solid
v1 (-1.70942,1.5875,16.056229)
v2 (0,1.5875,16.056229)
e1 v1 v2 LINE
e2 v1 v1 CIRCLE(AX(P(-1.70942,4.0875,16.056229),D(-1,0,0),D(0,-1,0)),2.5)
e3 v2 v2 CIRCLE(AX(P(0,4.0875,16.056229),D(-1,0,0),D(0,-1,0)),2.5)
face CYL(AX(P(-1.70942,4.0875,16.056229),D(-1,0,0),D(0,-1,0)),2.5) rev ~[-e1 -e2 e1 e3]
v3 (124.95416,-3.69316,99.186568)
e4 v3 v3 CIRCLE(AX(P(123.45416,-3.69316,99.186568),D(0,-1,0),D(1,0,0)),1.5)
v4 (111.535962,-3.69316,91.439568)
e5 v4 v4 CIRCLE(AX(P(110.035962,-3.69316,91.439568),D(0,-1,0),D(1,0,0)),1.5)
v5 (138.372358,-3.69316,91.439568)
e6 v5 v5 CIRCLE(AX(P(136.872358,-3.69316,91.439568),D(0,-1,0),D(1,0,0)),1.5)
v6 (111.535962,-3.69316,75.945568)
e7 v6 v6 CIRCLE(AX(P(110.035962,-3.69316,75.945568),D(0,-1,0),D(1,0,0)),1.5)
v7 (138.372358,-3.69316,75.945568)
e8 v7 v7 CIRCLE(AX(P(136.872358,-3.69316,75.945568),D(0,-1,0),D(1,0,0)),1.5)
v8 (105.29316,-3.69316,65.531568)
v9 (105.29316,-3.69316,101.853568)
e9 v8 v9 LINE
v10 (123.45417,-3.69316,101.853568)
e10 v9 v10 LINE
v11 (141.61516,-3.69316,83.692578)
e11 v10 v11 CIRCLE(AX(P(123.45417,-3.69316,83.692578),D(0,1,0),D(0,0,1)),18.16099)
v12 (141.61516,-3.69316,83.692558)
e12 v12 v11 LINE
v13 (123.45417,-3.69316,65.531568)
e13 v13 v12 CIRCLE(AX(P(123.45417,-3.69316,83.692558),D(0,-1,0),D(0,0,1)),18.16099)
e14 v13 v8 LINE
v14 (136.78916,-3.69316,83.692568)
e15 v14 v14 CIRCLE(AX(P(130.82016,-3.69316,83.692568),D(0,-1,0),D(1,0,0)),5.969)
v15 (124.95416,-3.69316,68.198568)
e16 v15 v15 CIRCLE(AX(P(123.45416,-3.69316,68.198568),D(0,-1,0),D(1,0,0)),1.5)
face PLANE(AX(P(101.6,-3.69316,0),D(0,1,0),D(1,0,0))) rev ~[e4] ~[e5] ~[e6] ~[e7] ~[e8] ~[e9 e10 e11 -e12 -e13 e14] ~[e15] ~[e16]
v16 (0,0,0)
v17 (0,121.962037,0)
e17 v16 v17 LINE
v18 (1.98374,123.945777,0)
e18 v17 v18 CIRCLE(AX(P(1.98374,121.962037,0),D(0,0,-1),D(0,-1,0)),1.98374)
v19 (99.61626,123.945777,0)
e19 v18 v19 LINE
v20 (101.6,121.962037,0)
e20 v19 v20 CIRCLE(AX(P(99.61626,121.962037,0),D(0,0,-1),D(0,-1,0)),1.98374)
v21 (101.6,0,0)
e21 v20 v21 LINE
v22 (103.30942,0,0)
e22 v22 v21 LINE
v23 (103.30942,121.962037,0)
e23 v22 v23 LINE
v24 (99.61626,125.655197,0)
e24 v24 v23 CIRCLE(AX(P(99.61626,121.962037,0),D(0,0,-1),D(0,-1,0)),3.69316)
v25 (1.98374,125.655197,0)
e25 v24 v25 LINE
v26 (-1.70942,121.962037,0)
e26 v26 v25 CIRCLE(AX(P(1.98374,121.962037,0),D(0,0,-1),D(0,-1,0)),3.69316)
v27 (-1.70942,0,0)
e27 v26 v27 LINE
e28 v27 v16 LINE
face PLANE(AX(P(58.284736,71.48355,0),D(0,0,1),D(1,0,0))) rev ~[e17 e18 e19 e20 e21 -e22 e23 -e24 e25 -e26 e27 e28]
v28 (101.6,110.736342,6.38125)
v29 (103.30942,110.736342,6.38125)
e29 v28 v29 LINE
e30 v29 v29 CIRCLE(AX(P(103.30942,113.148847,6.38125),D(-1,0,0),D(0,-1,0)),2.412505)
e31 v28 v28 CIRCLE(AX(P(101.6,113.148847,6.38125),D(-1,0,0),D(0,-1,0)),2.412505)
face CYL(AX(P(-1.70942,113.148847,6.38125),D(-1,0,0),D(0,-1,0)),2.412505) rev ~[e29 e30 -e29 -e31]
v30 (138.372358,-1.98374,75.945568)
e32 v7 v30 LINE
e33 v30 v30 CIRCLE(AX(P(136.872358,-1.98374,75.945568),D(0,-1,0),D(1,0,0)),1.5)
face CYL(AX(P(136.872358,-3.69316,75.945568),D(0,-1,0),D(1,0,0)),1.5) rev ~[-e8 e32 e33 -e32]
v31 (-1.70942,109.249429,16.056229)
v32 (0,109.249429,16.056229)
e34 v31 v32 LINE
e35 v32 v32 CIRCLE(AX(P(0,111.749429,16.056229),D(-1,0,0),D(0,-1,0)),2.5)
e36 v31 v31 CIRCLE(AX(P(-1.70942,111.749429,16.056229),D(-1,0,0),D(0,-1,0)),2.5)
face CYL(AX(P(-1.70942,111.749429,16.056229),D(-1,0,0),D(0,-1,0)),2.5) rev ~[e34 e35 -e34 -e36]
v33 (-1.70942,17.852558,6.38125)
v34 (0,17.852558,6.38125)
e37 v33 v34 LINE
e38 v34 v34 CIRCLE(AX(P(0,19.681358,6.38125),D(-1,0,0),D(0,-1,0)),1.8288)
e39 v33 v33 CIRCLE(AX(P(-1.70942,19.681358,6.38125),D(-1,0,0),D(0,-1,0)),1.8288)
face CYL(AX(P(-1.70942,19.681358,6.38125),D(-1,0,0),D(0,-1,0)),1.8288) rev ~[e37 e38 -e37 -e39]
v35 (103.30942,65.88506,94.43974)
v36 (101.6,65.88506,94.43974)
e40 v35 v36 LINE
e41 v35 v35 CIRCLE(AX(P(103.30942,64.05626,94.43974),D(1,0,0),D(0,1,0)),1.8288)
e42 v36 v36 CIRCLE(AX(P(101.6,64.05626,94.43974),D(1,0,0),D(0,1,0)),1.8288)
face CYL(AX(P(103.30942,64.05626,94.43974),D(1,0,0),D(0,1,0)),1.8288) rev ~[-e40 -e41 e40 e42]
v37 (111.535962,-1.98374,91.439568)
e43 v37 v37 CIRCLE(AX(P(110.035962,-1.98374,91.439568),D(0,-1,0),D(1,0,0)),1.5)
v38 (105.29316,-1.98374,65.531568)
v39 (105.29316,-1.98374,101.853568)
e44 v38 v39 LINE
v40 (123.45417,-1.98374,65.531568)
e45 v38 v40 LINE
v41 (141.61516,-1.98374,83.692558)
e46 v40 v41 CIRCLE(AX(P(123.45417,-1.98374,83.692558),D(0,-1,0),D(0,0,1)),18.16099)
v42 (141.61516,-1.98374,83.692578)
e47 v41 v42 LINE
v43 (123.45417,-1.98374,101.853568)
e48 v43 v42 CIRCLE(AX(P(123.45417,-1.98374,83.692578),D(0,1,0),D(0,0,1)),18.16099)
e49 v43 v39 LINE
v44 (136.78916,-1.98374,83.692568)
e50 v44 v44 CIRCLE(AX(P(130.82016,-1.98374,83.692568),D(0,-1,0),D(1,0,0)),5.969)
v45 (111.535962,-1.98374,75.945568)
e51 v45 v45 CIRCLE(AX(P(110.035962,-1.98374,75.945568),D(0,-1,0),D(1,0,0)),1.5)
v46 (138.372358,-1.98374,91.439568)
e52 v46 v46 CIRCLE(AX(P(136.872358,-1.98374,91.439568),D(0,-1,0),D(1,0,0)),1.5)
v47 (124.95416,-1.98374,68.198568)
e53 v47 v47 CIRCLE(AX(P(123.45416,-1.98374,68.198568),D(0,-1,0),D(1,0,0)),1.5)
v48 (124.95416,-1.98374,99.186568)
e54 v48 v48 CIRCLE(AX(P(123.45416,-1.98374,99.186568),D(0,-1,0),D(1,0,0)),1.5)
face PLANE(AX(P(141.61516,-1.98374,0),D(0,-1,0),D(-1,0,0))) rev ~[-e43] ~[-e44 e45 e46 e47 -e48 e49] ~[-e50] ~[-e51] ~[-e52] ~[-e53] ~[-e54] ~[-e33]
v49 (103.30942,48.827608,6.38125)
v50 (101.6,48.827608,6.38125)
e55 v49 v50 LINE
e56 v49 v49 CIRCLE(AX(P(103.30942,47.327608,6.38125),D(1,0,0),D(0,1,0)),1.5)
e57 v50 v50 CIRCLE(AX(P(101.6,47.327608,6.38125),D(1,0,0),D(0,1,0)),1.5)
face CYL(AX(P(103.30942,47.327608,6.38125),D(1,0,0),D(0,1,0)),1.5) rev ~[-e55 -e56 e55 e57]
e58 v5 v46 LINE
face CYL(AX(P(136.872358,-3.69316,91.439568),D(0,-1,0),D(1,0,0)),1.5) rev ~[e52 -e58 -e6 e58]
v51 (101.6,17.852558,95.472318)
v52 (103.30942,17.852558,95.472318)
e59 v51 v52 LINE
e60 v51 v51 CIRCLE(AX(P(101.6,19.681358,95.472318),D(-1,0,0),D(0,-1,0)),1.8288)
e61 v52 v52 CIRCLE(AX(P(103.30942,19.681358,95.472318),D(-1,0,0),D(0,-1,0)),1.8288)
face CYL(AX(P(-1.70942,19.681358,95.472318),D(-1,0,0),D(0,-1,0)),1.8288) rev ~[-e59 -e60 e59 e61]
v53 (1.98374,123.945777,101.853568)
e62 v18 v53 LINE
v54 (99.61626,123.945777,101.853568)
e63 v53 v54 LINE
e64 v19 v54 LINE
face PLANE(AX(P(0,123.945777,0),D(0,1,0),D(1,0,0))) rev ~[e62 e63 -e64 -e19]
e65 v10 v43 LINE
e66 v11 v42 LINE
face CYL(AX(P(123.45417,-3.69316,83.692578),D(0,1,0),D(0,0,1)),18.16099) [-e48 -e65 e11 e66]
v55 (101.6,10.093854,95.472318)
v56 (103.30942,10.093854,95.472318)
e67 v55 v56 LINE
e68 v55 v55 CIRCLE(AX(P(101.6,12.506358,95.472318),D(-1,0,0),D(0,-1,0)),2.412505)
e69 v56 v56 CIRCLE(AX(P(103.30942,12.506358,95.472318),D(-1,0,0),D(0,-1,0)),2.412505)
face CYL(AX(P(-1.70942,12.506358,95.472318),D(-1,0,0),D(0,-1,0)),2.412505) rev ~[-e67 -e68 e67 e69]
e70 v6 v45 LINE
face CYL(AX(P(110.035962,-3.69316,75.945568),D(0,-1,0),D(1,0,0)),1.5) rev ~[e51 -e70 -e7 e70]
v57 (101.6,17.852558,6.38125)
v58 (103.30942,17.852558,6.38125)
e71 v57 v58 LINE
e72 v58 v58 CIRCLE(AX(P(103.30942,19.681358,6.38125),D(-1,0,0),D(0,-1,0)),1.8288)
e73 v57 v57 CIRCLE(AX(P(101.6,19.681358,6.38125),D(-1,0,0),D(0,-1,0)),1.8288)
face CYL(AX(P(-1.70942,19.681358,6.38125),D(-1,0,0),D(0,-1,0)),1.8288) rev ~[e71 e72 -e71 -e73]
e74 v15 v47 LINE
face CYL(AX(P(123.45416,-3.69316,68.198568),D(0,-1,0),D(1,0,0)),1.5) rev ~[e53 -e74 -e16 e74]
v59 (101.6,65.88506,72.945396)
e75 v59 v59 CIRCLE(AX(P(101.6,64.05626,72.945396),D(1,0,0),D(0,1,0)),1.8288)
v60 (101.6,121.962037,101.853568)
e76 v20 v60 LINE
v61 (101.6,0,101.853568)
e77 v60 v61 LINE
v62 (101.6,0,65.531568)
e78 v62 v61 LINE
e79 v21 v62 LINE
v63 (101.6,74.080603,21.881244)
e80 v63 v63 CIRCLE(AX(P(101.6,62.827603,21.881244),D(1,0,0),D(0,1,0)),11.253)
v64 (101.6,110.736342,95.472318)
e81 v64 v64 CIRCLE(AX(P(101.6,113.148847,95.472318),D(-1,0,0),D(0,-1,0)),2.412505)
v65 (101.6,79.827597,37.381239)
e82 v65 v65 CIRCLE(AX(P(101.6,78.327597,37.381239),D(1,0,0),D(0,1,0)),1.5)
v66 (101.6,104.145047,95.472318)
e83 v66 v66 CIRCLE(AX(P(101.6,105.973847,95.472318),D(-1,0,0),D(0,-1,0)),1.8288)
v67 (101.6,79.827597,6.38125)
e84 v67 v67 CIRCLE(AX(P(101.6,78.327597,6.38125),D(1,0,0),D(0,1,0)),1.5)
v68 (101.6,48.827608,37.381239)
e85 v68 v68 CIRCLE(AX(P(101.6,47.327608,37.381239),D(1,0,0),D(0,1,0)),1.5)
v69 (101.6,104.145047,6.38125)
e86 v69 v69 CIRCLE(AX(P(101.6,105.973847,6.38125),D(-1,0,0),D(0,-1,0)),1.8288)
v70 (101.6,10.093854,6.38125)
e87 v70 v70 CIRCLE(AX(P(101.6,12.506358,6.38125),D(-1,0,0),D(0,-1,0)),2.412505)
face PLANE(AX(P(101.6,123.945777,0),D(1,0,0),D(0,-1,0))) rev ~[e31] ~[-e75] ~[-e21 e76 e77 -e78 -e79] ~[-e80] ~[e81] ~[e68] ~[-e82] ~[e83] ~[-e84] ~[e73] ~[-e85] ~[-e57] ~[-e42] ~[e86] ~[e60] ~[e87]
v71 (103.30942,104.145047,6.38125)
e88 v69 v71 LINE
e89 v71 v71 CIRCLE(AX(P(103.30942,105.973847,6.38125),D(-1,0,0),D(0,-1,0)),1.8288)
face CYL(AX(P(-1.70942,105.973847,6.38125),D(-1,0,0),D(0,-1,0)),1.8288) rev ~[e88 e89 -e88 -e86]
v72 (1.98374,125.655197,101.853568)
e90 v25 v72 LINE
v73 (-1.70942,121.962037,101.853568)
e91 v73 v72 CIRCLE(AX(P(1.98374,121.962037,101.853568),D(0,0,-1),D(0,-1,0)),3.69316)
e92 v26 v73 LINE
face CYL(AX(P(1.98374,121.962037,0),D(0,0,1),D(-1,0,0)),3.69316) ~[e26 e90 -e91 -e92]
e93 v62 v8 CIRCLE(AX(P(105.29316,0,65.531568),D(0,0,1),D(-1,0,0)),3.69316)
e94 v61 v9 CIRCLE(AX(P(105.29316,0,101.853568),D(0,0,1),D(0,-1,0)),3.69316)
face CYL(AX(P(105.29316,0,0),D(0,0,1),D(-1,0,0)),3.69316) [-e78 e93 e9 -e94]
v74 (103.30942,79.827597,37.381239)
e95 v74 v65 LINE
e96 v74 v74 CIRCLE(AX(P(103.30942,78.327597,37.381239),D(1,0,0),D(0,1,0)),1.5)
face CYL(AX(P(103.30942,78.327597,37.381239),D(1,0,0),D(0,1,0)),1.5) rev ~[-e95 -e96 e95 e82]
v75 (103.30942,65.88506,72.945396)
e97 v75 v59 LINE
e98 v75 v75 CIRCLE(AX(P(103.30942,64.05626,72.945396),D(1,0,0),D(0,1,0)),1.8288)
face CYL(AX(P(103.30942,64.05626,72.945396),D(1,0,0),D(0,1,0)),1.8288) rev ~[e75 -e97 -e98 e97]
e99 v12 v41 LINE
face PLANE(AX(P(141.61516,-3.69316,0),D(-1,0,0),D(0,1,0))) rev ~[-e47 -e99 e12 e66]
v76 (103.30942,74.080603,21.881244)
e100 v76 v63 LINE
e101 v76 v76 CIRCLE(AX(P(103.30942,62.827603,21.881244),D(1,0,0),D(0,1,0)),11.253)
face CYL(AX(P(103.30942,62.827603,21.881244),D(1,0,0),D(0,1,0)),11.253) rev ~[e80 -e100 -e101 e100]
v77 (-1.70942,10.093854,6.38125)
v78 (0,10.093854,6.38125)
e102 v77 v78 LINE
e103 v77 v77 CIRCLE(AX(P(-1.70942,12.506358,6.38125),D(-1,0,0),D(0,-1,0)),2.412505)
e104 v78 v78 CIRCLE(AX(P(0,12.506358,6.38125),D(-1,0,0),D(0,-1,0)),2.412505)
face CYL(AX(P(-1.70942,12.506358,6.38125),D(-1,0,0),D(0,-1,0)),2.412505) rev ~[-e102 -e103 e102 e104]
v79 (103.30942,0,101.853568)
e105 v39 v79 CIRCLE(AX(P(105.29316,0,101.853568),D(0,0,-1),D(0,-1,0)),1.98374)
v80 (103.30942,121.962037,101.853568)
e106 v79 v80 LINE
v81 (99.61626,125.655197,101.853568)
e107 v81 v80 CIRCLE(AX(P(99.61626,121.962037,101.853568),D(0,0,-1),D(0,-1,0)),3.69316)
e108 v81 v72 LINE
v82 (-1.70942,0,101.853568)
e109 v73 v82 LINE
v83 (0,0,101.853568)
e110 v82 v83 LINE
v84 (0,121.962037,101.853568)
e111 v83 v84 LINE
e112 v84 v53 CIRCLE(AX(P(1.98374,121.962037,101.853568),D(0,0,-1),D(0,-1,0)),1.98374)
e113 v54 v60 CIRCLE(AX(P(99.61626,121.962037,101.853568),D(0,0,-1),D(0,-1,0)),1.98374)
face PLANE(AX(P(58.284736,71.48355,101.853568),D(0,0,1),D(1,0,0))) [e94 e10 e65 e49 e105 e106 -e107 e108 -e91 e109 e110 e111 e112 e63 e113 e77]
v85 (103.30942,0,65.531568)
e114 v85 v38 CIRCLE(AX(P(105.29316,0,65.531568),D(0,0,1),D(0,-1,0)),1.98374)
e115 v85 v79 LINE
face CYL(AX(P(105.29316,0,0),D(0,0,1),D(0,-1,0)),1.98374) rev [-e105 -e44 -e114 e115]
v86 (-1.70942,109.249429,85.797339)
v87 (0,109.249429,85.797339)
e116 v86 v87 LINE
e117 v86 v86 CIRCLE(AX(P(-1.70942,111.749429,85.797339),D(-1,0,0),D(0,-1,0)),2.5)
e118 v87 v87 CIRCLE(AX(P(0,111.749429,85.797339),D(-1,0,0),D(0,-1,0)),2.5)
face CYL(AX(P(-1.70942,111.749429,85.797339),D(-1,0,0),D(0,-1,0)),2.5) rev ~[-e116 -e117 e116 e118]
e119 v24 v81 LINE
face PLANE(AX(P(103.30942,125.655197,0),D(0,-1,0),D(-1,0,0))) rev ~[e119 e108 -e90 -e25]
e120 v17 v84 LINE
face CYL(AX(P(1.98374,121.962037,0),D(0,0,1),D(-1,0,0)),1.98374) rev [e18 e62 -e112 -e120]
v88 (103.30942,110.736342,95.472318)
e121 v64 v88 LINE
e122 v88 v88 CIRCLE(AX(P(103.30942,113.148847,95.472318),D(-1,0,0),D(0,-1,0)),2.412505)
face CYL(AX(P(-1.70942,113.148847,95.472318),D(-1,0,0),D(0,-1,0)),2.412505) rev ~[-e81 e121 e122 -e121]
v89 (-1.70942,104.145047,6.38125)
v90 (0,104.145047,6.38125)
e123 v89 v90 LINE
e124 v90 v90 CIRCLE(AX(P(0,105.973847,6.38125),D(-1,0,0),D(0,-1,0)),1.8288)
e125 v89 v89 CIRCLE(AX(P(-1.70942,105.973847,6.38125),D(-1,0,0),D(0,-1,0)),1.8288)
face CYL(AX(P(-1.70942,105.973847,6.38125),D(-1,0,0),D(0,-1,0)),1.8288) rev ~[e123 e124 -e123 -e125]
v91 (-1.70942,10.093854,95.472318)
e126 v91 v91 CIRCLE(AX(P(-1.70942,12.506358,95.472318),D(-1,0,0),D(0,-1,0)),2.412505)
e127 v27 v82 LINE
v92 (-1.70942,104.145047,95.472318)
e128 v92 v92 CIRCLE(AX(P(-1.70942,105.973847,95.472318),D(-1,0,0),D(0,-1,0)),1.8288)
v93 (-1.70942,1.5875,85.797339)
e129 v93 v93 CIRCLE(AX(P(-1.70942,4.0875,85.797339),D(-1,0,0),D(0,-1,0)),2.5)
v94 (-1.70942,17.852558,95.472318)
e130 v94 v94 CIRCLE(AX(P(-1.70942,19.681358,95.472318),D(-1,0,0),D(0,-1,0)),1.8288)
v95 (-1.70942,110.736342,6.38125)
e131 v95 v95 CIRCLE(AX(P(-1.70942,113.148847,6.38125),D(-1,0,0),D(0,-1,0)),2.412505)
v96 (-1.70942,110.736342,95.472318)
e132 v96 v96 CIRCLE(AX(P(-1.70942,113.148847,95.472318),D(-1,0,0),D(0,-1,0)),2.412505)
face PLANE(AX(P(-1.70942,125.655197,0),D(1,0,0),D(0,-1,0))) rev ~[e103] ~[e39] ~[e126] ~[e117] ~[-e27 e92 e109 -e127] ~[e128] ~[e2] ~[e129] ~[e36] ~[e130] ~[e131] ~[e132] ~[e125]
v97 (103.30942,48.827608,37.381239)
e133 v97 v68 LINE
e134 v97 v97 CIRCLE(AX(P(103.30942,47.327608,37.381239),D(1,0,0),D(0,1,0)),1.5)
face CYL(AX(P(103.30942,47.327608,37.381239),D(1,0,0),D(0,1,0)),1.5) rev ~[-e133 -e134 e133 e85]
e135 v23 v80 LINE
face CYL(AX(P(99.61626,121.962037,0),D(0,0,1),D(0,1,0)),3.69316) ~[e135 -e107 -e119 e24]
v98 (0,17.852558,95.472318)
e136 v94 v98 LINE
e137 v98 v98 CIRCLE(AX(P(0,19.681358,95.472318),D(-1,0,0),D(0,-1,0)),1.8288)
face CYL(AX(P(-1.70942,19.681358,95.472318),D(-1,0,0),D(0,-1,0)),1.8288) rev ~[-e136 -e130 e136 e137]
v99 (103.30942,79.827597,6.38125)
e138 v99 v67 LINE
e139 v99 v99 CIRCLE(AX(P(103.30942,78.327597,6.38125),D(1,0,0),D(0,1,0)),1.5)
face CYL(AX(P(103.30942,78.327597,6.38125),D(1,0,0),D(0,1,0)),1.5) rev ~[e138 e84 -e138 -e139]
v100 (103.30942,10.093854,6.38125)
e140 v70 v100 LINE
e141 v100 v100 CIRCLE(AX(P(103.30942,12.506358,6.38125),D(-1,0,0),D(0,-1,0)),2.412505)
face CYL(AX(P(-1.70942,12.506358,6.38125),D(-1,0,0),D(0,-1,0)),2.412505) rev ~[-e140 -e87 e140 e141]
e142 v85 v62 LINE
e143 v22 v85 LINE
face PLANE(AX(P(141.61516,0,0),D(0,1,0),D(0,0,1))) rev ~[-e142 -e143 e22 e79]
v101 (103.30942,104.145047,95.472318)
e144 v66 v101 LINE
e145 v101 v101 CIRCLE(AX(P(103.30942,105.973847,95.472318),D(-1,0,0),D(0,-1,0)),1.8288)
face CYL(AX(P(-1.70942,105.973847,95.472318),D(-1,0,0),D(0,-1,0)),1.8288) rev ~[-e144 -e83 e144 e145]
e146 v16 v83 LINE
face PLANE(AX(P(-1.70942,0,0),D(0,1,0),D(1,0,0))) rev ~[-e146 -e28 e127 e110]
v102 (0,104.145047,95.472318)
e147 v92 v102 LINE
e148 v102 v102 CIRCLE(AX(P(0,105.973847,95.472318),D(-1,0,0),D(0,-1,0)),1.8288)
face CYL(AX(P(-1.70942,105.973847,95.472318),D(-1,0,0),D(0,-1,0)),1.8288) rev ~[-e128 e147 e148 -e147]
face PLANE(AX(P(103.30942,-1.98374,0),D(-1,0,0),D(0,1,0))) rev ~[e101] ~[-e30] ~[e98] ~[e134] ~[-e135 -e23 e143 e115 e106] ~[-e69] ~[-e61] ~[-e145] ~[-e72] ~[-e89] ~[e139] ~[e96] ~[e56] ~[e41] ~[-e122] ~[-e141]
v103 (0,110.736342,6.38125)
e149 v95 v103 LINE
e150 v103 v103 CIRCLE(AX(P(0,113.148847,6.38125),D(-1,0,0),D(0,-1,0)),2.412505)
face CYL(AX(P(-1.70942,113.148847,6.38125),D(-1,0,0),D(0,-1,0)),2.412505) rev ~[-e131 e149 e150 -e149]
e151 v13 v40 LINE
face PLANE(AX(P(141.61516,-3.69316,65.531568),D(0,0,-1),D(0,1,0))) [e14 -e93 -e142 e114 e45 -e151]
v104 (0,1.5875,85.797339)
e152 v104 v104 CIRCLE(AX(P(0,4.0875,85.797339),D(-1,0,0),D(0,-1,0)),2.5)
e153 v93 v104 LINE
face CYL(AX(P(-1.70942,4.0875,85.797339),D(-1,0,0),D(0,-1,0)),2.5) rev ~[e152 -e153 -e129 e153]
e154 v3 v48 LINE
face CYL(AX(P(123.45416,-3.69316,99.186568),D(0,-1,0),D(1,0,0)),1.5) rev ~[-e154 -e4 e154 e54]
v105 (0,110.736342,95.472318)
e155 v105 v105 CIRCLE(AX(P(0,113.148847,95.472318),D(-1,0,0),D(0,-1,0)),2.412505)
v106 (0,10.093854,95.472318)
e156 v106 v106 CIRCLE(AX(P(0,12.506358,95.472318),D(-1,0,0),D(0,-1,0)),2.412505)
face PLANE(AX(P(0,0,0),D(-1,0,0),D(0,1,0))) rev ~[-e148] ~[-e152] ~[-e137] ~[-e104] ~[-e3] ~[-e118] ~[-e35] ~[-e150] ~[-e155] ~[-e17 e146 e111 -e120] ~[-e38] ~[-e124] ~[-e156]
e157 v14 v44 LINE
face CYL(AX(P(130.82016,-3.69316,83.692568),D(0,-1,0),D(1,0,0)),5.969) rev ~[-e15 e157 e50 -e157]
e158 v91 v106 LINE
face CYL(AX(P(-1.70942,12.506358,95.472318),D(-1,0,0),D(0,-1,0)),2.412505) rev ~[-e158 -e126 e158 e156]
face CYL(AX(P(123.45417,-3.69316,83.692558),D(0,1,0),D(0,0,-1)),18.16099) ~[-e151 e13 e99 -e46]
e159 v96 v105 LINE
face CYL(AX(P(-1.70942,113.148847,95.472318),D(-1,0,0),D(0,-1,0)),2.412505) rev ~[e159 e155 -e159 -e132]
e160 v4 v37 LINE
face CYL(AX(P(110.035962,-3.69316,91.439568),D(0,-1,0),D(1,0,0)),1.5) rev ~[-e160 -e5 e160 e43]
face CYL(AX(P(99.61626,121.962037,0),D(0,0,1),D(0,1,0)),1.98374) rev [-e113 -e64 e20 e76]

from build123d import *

# Parameters (mm, degrees)
F1_DEPTH  = 101.8535682
F2_R      = 1.5
F2_R_2    = 5.969
F3_DEPTH  = 1.70942
F4_R      = 1.98374
F5_R      = 3.69316
F6_R      = 2.4125047
F6_R_2    = 1.8288
F7_DEPTH  = 105.01884
F8_R      = 11.2530001
F8_R_2    = 1.5
F8_R_3    = 1.8288
F9_DEPTH  = 103.30942
F10_W     = 3.69316
F10_H     = 65.5315682
F11_DEPTH = 40.01516
F12_R     = 18.16099
F13_R     = 2.5
F14_DEPTH = 1.70942


# Not quite as in the source:
# - a fillet or chamfer is up to 0.001 mm smaller than in the source, because OpenCascade refuses the exact size
# - a feature names something its author has since deleted; it is built from what else it names


with BuildPart() as f1:
    # F0 (on Top) → F1 (new body)
    with BuildSketch(Plane.XY):
        Polygon((-1.70942, 0), (0, 0), (0, 123.945777), (101.6, 123.945777), (101.6, -3.69316), (141.61516, -3.69316), (141.61516, -1.98374), (103.30942, -1.98374), (103.30942, 125.655197), (-1.70942, 125.655197), align=None)
    extrude(amount=F1_DEPTH)

    # F2 (on face) → F3 (cut, through all)
    with BuildSketch(Plane.XZ.offset(3.69316)):
        with Locations((136.8723576062, 91.4395682)):
            Circle(F2_R)
        with Locations((130.82016, 83.6925682)):
            Circle(F2_R_2)
        with Locations((136.8723576062, 75.9455682)):
            Circle(F2_R)
        with Locations((123.45416, 99.1865682)):
            Circle(F2_R)
        with Locations((110.0359623938, 91.4395682)):
            Circle(F2_R)
        with Locations((110.0359623938, 75.9455682)):
            Circle(F2_R)
        with Locations((123.45416, 68.1985682)):
            Circle(F2_R)
    extrude(amount=-F3_DEPTH, mode=Mode.SUBTRACT)

    # F4
    f4_edges = [f1.edges().sort_by_distance(p)[0] for p in [
        (0, 123.945777, 50.926784),
        (101.6, 123.945777, 50.926784),
        (103.30942, -1.98374, 50.926784),
    ]]
    fillet(f4_edges, radius=F4_R)

    # F5
    f5_edges = [f1.edges().sort_by_distance(p)[0] for p in [
        (-1.70942, 125.655197, 50.926784),
        (103.30942, 125.655197, 50.926784),
        (101.6, -3.69316, 50.926784),
    ]]
    fillet(f5_edges, radius=F5_R)

    # F6 (on face) → F7 (cut, through all)
    with BuildSketch(Plane(origin=(-1.70942, 0, 0), x_dir=(0, -1, 0), z_dir=(-1, 0, 0))):
        with Locations((-12.5063584, 95.4723182)):
            Circle(F6_R)
        with Locations((-19.6813584, 95.4723182)):
            Circle(F6_R_2)
        with Locations((-105.9738466, 95.4723182)):
            Circle(F6_R_2)
        with Locations((-105.9738466, 6.38125)):
            Circle(F6_R_2)
        with Locations((-19.6813584, 6.38125)):
            Circle(F6_R_2)
        with Locations((-113.1488466, 95.4723182)):
            Circle(F6_R)
        with Locations((-113.1488466, 6.38125)):
            Circle(F6_R)
        with Locations((-12.5063584, 6.38125)):
            Circle(F6_R)
    extrude(amount=-F7_DEPTH, mode=Mode.SUBTRACT)

    # F8 (on face) → F9 (cut, through all)
    with BuildSketch(Plane.YZ.offset(103.30942)):
        with Locations((62.8276025004, 21.8812444)):
            Circle(F8_R)
        with Locations((47.3276081004, 37.3812388)):
            Circle(F8_R_2)
        with Locations((78.3275969004, 37.3812388)):
            Circle(F8_R_2)
        with Locations((78.3275969004, 6.38125)):
            Circle(F8_R_2)
        with Locations((47.3276081004, 6.38125)):
            Circle(F8_R_2)
        with Locations((64.05626, 72.9453964)):
            Circle(F8_R_3)
        with Locations((64.05626, 94.43974)):
            Circle(F8_R_3)
    extrude(amount=-F9_DEPTH, mode=Mode.SUBTRACT)

    # F10 (on face) → F11 (cut, through all)
    with BuildSketch(Plane.YZ.offset(141.61516)):
        with Locations((-1.84658, 32.7657841)):
            Rectangle(F10_W, F10_H)
    extrude(amount=-F11_DEPTH, mode=Mode.SUBTRACT)

    # F12 (radius 18.161 in the source; OpenCascade refuses exactly that, so slightly less here)
    f12_edges = [f1.edges().sort_by_distance(p)[0] for p in [
        (141.61516, -2.83845, 65.531568),
        (141.61516, -2.83845, 101.853568),
    ]]
    fillet(f12_edges, radius=F12_R)

    # F13 (on face) → F14 (cut, through all)
    with BuildSketch(Plane(origin=(-1.70942, 0, 0), x_dir=(0, -1, 0), z_dir=(-1, 0, 0))):
        with Locations((-111.7494286, 16.056229)):
            Circle(F13_R)
        with Locations((-4.0875, 16.056229)):
            Circle(F13_R)
        with Locations((-4.0875, 85.7973392)):
            Circle(F13_R)
        with Locations((-111.7494286, 85.7973392)):
            Circle(F13_R)
    extrude(amount=-F14_DEPTH, mode=Mode.SUBTRACT)


solid = f1.part
